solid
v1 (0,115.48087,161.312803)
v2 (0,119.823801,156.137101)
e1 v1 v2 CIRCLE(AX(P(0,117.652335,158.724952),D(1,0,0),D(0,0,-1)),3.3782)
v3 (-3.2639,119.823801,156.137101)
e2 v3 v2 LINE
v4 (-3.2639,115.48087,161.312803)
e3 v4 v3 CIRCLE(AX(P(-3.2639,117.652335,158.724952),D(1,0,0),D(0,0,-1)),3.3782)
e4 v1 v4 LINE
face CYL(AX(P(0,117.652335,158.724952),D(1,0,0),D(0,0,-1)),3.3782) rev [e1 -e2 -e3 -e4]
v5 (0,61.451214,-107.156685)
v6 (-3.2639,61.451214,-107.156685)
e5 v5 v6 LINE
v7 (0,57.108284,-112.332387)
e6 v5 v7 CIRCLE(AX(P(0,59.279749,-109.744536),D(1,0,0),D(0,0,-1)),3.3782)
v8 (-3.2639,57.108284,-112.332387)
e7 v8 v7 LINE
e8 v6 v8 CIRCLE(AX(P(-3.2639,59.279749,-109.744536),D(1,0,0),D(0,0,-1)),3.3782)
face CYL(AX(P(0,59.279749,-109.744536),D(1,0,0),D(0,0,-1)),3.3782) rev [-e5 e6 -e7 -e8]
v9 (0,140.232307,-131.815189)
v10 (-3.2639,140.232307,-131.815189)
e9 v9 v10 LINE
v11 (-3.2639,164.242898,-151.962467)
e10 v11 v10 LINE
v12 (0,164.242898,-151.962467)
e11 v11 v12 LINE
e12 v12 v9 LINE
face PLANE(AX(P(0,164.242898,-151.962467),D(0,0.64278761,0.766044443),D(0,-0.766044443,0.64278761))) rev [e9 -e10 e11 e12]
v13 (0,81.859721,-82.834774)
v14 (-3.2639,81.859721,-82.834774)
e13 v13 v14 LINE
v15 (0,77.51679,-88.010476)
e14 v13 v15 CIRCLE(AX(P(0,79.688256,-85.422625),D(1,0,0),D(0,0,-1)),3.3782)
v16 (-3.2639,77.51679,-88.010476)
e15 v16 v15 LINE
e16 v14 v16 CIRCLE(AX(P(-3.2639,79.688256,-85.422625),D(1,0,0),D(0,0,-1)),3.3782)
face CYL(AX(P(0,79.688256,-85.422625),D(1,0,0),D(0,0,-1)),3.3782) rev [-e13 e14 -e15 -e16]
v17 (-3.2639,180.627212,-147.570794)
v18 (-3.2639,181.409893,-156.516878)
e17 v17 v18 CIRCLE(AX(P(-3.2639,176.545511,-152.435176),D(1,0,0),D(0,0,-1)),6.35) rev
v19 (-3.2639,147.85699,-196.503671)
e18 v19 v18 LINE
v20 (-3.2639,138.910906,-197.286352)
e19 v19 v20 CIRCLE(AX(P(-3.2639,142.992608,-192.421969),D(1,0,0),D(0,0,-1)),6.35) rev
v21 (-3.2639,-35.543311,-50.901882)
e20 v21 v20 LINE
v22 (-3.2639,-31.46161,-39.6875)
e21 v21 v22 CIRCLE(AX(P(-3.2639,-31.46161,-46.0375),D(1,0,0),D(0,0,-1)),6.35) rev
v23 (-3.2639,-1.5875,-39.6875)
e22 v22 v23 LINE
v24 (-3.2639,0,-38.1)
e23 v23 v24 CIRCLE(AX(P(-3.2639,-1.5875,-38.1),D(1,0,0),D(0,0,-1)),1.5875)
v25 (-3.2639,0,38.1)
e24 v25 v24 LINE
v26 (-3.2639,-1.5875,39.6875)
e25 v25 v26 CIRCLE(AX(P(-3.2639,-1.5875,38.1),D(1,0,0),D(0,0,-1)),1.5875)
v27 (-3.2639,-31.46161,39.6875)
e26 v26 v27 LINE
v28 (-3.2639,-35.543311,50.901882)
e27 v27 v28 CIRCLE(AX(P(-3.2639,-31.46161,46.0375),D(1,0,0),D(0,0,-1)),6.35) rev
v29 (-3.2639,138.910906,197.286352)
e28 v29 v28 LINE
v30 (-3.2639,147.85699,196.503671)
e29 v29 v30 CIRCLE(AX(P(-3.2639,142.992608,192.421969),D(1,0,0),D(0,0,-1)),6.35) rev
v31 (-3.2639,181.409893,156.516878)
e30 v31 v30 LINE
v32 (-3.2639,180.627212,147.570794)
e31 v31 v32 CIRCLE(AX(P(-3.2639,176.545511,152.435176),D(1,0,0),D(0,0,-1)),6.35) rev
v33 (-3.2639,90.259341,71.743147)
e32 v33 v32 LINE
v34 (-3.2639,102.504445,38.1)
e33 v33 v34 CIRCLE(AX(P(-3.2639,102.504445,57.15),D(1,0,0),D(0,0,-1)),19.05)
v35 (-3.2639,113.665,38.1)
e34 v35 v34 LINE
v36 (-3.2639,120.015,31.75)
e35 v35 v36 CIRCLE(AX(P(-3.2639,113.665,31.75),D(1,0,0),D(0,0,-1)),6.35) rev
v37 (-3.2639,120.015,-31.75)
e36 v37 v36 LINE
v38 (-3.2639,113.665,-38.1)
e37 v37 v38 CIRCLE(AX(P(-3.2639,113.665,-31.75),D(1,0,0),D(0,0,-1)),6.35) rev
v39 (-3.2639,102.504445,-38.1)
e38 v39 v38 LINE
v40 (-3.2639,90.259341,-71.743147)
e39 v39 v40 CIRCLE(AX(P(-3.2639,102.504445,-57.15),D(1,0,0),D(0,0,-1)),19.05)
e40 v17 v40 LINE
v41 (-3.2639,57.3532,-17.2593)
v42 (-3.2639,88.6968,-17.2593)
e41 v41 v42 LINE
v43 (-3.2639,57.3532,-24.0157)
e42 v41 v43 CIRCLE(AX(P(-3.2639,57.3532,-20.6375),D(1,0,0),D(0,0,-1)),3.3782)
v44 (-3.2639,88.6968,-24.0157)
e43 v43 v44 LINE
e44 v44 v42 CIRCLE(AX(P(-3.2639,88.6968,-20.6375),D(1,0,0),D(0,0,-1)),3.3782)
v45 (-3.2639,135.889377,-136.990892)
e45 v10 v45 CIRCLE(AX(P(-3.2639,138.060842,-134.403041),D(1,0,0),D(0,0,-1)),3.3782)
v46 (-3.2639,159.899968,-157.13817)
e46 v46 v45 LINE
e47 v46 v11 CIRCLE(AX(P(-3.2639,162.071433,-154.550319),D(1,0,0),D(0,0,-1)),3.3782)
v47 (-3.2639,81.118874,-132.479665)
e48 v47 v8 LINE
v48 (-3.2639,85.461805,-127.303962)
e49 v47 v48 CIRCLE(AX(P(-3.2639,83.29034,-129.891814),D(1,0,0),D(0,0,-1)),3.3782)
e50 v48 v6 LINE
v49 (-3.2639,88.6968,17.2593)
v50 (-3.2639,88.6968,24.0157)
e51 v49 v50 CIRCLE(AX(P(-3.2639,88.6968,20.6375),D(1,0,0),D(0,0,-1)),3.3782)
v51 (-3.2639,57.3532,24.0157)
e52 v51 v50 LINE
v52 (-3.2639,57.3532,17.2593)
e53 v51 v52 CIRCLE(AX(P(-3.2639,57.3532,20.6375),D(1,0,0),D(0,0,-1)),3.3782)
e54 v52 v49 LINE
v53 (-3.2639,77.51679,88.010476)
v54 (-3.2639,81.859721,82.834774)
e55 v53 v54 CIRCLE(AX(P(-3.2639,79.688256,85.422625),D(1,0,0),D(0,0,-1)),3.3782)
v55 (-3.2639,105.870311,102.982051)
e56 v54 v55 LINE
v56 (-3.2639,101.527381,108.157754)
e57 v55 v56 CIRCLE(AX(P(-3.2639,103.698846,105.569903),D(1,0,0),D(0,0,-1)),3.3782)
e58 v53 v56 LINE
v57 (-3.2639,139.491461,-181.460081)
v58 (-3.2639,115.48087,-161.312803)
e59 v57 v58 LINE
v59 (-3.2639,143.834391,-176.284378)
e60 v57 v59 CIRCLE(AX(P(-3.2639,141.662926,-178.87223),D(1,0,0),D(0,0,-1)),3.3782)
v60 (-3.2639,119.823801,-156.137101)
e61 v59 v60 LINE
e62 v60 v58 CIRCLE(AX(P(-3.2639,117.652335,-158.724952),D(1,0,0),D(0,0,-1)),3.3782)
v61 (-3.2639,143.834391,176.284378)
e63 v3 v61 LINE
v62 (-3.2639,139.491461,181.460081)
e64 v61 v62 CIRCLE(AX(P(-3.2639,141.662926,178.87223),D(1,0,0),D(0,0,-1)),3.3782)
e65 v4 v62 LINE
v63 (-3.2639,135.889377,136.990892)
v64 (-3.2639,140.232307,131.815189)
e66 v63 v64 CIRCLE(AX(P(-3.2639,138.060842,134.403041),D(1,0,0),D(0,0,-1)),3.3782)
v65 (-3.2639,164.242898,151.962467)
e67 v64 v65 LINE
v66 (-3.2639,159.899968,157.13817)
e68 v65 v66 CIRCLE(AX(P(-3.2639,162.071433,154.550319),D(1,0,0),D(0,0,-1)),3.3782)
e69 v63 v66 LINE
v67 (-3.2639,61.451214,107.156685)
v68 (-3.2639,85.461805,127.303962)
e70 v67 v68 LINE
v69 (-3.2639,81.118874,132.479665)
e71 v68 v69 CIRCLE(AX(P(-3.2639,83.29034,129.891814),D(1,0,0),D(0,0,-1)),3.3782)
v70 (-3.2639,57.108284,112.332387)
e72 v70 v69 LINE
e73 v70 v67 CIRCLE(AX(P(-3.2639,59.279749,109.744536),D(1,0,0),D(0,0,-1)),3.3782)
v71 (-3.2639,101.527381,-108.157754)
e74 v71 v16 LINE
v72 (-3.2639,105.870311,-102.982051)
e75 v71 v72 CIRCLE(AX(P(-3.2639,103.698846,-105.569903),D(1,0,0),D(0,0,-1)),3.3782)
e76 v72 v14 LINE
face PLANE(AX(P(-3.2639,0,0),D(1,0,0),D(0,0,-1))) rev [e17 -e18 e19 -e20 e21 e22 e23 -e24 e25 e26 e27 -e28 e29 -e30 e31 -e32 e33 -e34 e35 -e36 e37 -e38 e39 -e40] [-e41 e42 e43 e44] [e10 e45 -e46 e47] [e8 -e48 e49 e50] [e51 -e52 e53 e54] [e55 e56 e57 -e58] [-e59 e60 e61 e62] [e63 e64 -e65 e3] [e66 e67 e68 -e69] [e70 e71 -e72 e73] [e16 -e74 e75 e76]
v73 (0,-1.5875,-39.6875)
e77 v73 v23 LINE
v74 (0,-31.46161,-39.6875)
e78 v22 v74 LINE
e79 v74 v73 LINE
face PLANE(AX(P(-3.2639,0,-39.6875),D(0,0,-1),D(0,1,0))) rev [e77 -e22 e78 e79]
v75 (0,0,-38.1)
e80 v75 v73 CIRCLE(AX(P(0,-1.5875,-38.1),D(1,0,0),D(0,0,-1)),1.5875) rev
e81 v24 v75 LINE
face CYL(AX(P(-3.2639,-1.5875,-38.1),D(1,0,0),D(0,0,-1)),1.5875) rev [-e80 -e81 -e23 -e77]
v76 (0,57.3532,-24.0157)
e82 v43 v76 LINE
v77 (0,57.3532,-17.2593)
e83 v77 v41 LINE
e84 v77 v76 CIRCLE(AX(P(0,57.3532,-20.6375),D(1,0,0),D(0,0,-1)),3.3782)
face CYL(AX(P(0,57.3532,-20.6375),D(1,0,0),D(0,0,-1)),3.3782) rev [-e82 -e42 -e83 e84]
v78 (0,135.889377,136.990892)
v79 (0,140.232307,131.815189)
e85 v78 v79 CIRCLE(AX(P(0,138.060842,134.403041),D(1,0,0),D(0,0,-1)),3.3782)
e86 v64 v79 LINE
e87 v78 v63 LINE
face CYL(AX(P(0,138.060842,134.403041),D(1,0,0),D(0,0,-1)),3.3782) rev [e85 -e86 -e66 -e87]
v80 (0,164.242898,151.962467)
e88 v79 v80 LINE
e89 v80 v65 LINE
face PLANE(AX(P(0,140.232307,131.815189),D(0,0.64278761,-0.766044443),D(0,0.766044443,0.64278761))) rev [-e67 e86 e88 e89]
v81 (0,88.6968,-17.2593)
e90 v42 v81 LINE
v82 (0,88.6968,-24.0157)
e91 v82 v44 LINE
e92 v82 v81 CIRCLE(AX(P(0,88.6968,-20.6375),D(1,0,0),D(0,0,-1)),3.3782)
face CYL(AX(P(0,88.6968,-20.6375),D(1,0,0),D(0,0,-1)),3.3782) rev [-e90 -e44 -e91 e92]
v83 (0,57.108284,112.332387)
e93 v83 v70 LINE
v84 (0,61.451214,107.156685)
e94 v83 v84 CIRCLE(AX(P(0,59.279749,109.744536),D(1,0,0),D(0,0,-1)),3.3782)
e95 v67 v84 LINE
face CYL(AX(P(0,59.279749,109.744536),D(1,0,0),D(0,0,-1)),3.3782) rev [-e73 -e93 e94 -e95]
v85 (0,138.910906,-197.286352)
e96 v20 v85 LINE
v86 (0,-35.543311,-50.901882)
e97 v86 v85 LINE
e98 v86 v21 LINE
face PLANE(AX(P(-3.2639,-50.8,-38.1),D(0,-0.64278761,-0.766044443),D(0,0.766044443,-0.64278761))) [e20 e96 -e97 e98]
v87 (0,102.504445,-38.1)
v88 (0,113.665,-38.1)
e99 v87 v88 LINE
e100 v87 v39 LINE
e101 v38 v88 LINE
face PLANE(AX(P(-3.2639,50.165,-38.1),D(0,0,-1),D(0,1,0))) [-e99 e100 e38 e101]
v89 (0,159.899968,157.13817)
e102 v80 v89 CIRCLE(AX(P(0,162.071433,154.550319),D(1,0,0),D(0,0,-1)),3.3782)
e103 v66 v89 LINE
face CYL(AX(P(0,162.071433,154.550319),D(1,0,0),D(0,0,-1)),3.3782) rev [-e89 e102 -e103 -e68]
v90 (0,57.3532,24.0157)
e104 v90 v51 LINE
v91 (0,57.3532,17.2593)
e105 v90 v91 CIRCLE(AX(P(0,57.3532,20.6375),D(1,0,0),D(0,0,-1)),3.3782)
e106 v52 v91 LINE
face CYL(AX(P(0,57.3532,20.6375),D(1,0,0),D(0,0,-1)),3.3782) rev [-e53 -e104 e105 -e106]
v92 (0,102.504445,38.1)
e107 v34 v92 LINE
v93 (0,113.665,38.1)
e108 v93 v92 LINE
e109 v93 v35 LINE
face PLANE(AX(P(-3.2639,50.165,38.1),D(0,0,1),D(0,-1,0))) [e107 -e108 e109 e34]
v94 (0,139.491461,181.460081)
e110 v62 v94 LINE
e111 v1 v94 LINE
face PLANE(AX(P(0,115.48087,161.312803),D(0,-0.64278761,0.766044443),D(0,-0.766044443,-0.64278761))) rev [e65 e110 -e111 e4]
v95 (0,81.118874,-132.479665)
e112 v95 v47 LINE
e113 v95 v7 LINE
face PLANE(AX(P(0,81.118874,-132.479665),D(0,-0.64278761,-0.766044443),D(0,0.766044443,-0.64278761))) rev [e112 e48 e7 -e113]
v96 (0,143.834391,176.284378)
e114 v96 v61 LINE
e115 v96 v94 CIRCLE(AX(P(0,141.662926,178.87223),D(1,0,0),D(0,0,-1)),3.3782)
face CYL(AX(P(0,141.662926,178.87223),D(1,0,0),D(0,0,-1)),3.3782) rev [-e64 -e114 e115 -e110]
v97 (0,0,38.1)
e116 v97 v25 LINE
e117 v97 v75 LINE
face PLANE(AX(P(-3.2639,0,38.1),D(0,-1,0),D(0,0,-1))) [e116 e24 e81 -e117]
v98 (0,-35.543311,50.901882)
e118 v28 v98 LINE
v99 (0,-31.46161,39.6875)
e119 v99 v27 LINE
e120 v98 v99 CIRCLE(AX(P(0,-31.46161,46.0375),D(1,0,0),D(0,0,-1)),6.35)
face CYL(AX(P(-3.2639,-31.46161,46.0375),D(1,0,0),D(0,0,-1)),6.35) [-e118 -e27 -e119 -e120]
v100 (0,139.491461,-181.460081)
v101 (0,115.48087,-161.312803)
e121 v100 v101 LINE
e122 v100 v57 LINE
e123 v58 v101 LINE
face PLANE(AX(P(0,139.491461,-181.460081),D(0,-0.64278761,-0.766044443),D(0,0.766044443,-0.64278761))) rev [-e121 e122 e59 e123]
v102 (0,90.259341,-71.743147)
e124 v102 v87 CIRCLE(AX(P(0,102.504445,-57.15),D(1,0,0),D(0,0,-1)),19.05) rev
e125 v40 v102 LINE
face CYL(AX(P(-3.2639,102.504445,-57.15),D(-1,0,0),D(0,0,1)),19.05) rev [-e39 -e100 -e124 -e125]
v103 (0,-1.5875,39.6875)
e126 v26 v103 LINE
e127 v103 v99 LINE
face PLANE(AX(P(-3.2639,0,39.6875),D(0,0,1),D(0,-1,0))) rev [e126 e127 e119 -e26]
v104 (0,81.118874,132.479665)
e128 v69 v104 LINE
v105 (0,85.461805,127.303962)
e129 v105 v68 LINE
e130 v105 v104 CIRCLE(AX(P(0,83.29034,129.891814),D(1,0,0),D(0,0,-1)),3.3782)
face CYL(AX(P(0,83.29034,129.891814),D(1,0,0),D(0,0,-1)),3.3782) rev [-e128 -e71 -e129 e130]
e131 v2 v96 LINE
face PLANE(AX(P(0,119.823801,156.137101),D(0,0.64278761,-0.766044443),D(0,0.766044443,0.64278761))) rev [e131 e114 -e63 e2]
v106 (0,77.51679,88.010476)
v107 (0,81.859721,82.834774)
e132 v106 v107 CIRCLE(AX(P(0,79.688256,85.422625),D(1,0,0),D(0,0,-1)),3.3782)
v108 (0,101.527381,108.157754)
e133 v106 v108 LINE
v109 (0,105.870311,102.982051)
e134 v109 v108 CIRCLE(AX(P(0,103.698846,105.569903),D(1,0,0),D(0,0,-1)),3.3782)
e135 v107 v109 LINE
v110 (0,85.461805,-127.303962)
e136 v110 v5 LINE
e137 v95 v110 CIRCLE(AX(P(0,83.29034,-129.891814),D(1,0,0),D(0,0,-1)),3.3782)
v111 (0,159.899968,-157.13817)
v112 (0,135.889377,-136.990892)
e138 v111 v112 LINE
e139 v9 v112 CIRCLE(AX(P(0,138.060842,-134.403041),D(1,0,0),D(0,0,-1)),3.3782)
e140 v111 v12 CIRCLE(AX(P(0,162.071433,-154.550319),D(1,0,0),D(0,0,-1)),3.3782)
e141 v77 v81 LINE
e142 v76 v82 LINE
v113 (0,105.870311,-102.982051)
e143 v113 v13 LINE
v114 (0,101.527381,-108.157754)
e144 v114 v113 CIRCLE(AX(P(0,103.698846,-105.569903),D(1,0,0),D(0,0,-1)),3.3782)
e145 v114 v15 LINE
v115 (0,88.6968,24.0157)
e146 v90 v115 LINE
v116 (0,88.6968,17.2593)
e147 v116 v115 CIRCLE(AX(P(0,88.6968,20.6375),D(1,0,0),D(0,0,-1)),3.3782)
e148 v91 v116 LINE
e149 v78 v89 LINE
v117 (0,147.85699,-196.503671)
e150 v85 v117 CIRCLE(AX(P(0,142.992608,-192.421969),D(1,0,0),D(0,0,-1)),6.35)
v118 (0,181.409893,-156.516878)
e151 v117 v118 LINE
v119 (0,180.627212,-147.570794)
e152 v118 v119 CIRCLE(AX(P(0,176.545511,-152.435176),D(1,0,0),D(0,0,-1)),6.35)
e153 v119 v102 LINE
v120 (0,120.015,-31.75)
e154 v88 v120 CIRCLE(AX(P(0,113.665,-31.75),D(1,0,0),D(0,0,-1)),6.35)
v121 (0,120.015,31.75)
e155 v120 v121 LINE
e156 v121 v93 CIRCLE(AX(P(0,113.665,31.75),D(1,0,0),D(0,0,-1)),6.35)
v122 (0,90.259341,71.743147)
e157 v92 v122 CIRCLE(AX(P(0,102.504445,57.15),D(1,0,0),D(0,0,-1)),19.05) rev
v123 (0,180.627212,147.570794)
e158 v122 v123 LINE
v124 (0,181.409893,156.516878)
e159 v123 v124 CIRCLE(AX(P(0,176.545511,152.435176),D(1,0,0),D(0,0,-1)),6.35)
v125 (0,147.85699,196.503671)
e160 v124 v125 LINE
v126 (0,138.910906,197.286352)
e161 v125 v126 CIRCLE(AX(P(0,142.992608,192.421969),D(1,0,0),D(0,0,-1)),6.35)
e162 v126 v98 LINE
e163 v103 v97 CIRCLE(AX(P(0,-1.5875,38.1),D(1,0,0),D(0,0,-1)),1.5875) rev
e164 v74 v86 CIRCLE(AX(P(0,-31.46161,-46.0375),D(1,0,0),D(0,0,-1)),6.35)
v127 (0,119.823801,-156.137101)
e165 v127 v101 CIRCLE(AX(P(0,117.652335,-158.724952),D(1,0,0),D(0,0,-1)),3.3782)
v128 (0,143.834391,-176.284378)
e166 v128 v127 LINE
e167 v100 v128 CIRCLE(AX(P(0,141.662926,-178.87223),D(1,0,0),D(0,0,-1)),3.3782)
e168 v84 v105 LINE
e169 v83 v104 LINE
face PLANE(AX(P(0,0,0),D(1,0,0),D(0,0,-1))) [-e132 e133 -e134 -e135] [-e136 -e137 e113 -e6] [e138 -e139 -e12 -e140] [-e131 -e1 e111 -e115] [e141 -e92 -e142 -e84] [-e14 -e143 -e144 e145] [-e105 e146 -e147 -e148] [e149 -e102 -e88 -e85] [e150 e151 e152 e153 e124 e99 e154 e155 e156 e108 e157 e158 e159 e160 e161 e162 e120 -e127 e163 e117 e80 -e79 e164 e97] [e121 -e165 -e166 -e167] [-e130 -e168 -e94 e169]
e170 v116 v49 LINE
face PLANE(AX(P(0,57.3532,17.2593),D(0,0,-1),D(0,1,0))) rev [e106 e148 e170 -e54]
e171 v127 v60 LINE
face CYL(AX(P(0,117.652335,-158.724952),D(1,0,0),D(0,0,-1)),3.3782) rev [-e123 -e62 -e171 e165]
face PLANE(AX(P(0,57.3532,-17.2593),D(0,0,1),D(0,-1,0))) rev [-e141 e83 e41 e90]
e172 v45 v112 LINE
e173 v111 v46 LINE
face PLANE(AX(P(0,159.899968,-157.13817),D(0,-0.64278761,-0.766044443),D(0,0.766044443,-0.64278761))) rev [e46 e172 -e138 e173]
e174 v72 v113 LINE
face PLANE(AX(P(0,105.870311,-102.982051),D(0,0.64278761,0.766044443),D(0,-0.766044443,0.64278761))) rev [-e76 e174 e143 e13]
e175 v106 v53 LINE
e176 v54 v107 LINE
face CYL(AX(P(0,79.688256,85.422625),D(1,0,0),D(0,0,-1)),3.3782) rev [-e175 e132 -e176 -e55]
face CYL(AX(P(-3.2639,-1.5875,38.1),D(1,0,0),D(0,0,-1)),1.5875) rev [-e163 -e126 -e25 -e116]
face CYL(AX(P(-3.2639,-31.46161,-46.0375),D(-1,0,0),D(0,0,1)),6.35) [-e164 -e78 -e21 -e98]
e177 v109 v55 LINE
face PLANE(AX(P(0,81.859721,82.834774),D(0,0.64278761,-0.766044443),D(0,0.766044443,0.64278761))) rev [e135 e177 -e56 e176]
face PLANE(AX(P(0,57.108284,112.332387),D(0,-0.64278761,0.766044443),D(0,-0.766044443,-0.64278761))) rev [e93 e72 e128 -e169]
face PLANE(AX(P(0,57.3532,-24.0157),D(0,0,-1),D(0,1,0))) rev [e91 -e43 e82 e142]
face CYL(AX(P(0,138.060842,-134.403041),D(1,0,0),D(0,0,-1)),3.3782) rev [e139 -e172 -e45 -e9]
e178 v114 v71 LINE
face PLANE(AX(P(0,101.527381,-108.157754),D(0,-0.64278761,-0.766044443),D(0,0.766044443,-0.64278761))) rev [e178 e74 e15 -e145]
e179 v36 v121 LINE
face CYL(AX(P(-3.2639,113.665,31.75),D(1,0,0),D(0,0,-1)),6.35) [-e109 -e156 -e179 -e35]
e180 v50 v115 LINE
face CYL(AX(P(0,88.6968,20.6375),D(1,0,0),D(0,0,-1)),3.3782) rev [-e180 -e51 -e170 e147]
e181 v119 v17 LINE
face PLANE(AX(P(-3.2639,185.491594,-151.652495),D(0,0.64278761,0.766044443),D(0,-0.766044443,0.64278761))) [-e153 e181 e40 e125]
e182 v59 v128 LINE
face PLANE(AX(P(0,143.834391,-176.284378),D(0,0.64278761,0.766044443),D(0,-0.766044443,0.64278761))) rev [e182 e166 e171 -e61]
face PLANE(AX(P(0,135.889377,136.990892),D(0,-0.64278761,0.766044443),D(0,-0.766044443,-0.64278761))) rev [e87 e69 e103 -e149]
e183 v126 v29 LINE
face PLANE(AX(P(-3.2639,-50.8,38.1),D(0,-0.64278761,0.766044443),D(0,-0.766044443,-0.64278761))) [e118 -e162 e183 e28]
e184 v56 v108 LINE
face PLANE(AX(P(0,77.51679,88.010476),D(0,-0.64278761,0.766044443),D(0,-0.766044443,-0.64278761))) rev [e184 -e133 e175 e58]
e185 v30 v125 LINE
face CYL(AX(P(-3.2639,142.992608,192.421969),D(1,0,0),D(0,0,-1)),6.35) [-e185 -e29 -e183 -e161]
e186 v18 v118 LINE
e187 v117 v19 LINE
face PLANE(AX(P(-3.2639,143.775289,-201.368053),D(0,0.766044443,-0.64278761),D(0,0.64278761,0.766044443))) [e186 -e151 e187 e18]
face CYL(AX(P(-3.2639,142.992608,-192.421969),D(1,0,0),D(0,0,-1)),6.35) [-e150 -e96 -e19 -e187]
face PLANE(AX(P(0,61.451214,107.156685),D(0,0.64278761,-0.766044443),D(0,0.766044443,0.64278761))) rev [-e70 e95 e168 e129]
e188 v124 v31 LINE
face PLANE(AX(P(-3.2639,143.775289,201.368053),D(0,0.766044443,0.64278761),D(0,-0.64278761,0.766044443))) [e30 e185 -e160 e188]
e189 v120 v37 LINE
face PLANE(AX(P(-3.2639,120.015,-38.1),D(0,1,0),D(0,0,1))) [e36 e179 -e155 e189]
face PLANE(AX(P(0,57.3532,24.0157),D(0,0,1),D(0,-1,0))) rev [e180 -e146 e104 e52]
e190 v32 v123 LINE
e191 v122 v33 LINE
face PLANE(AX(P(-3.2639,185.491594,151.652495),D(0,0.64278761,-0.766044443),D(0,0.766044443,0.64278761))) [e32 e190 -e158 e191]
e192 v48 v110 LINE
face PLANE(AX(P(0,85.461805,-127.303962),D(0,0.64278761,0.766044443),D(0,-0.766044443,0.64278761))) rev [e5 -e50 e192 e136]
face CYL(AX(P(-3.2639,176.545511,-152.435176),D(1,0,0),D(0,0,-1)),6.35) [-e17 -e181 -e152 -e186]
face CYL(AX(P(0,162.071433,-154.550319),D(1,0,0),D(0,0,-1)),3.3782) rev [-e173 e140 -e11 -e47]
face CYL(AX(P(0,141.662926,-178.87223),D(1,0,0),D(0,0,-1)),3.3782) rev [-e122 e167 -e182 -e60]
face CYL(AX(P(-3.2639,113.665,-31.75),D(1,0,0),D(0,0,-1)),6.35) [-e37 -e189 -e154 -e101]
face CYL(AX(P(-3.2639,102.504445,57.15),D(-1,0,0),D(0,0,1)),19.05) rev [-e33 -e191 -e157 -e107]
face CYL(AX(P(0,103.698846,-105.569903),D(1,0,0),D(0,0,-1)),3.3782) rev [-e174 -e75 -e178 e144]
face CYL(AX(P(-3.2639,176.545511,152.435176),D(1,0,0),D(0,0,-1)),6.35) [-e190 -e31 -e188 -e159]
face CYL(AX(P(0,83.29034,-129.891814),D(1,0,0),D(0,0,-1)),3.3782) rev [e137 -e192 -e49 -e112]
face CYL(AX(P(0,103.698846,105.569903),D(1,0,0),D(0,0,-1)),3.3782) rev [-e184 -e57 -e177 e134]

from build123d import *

# Parameters (mm, degrees)
BASE_FLANGE1_DEPTH          = 3.2639
F_1_4_START                 = -3.2639
F_1_4_CLEARANCE_SLOT1_DEPTH = 3.2639
SKETCH9_W                   = 1.5875
SKETCH9_H                   = 50.8
CUT_EXTRUDE1_DEPTH          = 274.80079868
FILLET1_R                   = 6.35
FILLET2_R                   = 19.05
FILLET3_R                   = 6.35
FILLET4_R                   = 1.5875
F_1_4_CLEARANCE_SLOT2_DEPTH = 3.2639
F_1_4_CLEARANCE_SLOT3_DEPTH = 3.2639


# Read off the part's stored shape, not the designer's step: 1/4 Clearance Slot1, 1/4 Clearance Slot2, 1/4 Clearance Slot3
# Sheet-metal steps are written as plain solids
with BuildPart() as part:
    # Sketch1 → Base-Flange1 (new body)
    with BuildSketch(Plane(origin=(0, 0, 0), x_dir=(0, 0, -1), z_dir=(1, 0, 0))):
        Polygon((38.1, 0), (38.1, -50.8), (201.36805286, 143.775288552), (151.652495469, 185.491594423), (38.1, 50.165), (38.1, 120.015), (-38.1, 120.015), (-38.1, 50.165), (-151.652495469, 185.491594423), (-201.36805286, 143.775288552), (-38.1, -50.8), (-38.1, 0), align=None)
    extrude(amount=-BASE_FLANGE1_DEPTH)

    # 1/4 Clearance Slot1 outline → 1/4 Clearance Slot1 (cut)
    with BuildSketch(Plane.YZ.offset(F_1_4_START)):
        with BuildLine():
            Line((57.3532, -24.0157), (88.6968, -24.0157))
            ThreePointArc((88.6968, -24.0157), (92.075, -20.6375), (88.6968, -17.2593))
            Line((88.6968, -17.2593), (57.3532, -17.2593))
            ThreePointArc((57.3532, -17.2593), (53.975, -20.6375), (57.3532, -24.0157))
        make_face()
        with BuildLine():
            Line((57.3532, 17.2593), (88.6968, 17.2593))
            ThreePointArc((88.6968, 17.2593), (92.075, 20.6375), (88.6968, 24.0157))
            Line((88.6968, 24.0157), (57.3532, 24.0157))
            ThreePointArc((57.3532, 24.0157), (53.975, 20.6375), (57.3532, 17.2593))
        make_face()
    extrude(amount=F_1_4_CLEARANCE_SLOT1_DEPTH, mode=Mode.SUBTRACT)

    # Sketch9 → Cut-Extrude1 (cut, through all)
    with BuildSketch(Plane(origin=(0, 0, 0), x_dir=(0, 0, -1), z_dir=(1, 0, 0))):
        with Locations((-38.89375, -25.4)):
            Rectangle(SKETCH9_W, SKETCH9_H)
        with Locations((38.89375, -25.4)):
            Rectangle(SKETCH9_W, SKETCH9_H)
    extrude(amount=-CUT_EXTRUDE1_DEPTH, mode=Mode.SUBTRACT)

    # Fillet1
    fillet1_edges = [part.edges().sort_by_distance(p)[0] for p in [
        (-1.63195, 185.491594423, -151.652495469),
        (-1.63195, 143.775288552, -201.36805286),
        (-1.63195, 143.775288552, 201.36805286),
        (-1.63195, 185.491594423, 151.652495469),
        (-1.63195, -48.908091172, 39.6875),
        (-1.63195, -48.908091172, -39.6875),
    ]]
    fillet(fillet1_edges, radius=FILLET1_R)

    # Fillet2
    fillet2_edges = [part.edges().sort_by_distance(p)[0] for p in [
        (-1.63195, 50.165, -38.1),
        (-1.63195, 50.165, 38.1),
    ]]
    fillet(fillet2_edges, radius=FILLET2_R)

    # Fillet3
    fillet3_edges = [part.edges().sort_by_distance(p)[0] for p in [
        (-1.63195, 120.015, 38.1),
        (-1.63195, 120.015, -38.1),
    ]]
    fillet(fillet3_edges, radius=FILLET3_R)

    # Fillet4
    fillet4_edges = [part.edges().sort_by_distance(p)[0] for p in [
        (-1.63195, 0, 39.6875),
        (-1.63195, 0, -39.6875),
    ]]
    fillet(fillet4_edges, radius=FILLET4_R)

    # 1/4 Clearance Slot2 outline → 1/4 Clearance Slot2 (cut)
    with BuildSketch(Plane.YZ.offset(F_1_4_START)):
        with BuildLine():
            Line((105.870311236, -102.982051315), (81.859720628, -82.834773592))
            ThreePointArc((81.859720628, -82.834773592), (77.100404187, -83.251159826), (77.516790422, -88.010476267))
            Line((77.516790422, -88.010476267), (101.527381029, -108.15775399))
            ThreePointArc((101.527381029, -108.15775399), (106.28669747, -107.741367756), (105.870311236, -102.982051315))
        make_face()
        with BuildLine():
            ThreePointArc((140.232307194, -131.81518945), (135.472990753, -132.231575685), (135.889376988, -136.990892126))
            Line((135.889376988, -136.990892126), (159.899967595, -157.138169849))
            ThreePointArc((159.899967595, -157.138169849), (164.659284036, -156.721783614), (164.242897801, -151.962467173))
            Line((164.242897801, -151.962467173), (140.232307194, -131.81518945))
        make_face()
        with BuildLine():
            Line((85.461804628, -127.303962384), (61.451214021, -107.156684661))
            ThreePointArc((61.451214021, -107.156684661), (56.69189758, -107.573070895), (57.108283815, -112.332387336))
            Line((57.108283815, -112.332387336), (81.118874422, -132.479665059))
            ThreePointArc((81.118874422, -132.479665059), (85.878190863, -132.063278825), (85.461804628, -127.303962384))
        make_face()
        with BuildLine():
            ThreePointArc((119.823800586, -156.137100519), (115.064484146, -156.553486754), (115.48087038, -161.312803195))
            Line((115.48087038, -161.312803195), (139.491460988, -181.460080918))
            ThreePointArc((139.491460988, -181.460080918), (144.250777428, -181.043694683), (143.834391194, -176.284378242))
            Line((143.834391194, -176.284378242), (119.823800586, -156.137100519))
        make_face()
    extrude(amount=F_1_4_CLEARANCE_SLOT2_DEPTH, mode=Mode.SUBTRACT)

    # 1/4 Clearance Slot3 outline → 1/4 Clearance Slot3 (cut)
    with BuildSketch(Plane.YZ.offset(F_1_4_START)):
        with BuildLine():
            Line((61.451214021, 107.156684661), (85.461804628, 127.303962384))
            ThreePointArc((85.461804628, 127.303962384), (85.878190863, 132.063278825), (81.118874422, 132.479665059))
            Line((81.118874422, 132.479665059), (57.108283815, 112.332387336))
            ThreePointArc((57.108283815, 112.332387336), (56.69189758, 107.573070895), (61.451214021, 107.156684661))
        make_face()
        with BuildLine():
            ThreePointArc((143.834391194, 176.284378242), (144.250777428, 181.043694683), (139.491460988, 181.460080918))
            Line((139.491460988, 181.460080918), (115.48087038, 161.312803195))
            ThreePointArc((115.48087038, 161.312803195), (115.064484146, 156.553486754), (119.823800586, 156.137100519))
            Line((119.823800586, 156.137100519), (143.834391194, 176.284378242))
        make_face()
        with BuildLine():
            Line((81.859720628, 82.834773592), (105.870311236, 102.982051315))
            ThreePointArc((105.870311236, 102.982051315), (106.28669747, 107.741367756), (101.527381029, 108.15775399))
            Line((101.527381029, 108.15775399), (77.516790422, 88.010476267))
            ThreePointArc((77.516790422, 88.010476267), (77.100404187, 83.251159826), (81.859720628, 82.834773592))
        make_face()
        with BuildLine():
            ThreePointArc((164.242897801, 151.962467173), (164.659284036, 156.721783614), (159.899967595, 157.138169849))
            Line((159.899967595, 157.138169849), (135.889376988, 136.990892126))
            ThreePointArc((135.889376988, 136.990892126), (135.472990753, 132.231575685), (140.232307194, 131.81518945))
            Line((140.232307194, 131.81518945), (164.242897801, 151.962467173))
        make_face()
    extrude(amount=F_1_4_CLEARANCE_SLOT3_DEPTH, mode=Mode.SUBTRACT)


solid = part.part
